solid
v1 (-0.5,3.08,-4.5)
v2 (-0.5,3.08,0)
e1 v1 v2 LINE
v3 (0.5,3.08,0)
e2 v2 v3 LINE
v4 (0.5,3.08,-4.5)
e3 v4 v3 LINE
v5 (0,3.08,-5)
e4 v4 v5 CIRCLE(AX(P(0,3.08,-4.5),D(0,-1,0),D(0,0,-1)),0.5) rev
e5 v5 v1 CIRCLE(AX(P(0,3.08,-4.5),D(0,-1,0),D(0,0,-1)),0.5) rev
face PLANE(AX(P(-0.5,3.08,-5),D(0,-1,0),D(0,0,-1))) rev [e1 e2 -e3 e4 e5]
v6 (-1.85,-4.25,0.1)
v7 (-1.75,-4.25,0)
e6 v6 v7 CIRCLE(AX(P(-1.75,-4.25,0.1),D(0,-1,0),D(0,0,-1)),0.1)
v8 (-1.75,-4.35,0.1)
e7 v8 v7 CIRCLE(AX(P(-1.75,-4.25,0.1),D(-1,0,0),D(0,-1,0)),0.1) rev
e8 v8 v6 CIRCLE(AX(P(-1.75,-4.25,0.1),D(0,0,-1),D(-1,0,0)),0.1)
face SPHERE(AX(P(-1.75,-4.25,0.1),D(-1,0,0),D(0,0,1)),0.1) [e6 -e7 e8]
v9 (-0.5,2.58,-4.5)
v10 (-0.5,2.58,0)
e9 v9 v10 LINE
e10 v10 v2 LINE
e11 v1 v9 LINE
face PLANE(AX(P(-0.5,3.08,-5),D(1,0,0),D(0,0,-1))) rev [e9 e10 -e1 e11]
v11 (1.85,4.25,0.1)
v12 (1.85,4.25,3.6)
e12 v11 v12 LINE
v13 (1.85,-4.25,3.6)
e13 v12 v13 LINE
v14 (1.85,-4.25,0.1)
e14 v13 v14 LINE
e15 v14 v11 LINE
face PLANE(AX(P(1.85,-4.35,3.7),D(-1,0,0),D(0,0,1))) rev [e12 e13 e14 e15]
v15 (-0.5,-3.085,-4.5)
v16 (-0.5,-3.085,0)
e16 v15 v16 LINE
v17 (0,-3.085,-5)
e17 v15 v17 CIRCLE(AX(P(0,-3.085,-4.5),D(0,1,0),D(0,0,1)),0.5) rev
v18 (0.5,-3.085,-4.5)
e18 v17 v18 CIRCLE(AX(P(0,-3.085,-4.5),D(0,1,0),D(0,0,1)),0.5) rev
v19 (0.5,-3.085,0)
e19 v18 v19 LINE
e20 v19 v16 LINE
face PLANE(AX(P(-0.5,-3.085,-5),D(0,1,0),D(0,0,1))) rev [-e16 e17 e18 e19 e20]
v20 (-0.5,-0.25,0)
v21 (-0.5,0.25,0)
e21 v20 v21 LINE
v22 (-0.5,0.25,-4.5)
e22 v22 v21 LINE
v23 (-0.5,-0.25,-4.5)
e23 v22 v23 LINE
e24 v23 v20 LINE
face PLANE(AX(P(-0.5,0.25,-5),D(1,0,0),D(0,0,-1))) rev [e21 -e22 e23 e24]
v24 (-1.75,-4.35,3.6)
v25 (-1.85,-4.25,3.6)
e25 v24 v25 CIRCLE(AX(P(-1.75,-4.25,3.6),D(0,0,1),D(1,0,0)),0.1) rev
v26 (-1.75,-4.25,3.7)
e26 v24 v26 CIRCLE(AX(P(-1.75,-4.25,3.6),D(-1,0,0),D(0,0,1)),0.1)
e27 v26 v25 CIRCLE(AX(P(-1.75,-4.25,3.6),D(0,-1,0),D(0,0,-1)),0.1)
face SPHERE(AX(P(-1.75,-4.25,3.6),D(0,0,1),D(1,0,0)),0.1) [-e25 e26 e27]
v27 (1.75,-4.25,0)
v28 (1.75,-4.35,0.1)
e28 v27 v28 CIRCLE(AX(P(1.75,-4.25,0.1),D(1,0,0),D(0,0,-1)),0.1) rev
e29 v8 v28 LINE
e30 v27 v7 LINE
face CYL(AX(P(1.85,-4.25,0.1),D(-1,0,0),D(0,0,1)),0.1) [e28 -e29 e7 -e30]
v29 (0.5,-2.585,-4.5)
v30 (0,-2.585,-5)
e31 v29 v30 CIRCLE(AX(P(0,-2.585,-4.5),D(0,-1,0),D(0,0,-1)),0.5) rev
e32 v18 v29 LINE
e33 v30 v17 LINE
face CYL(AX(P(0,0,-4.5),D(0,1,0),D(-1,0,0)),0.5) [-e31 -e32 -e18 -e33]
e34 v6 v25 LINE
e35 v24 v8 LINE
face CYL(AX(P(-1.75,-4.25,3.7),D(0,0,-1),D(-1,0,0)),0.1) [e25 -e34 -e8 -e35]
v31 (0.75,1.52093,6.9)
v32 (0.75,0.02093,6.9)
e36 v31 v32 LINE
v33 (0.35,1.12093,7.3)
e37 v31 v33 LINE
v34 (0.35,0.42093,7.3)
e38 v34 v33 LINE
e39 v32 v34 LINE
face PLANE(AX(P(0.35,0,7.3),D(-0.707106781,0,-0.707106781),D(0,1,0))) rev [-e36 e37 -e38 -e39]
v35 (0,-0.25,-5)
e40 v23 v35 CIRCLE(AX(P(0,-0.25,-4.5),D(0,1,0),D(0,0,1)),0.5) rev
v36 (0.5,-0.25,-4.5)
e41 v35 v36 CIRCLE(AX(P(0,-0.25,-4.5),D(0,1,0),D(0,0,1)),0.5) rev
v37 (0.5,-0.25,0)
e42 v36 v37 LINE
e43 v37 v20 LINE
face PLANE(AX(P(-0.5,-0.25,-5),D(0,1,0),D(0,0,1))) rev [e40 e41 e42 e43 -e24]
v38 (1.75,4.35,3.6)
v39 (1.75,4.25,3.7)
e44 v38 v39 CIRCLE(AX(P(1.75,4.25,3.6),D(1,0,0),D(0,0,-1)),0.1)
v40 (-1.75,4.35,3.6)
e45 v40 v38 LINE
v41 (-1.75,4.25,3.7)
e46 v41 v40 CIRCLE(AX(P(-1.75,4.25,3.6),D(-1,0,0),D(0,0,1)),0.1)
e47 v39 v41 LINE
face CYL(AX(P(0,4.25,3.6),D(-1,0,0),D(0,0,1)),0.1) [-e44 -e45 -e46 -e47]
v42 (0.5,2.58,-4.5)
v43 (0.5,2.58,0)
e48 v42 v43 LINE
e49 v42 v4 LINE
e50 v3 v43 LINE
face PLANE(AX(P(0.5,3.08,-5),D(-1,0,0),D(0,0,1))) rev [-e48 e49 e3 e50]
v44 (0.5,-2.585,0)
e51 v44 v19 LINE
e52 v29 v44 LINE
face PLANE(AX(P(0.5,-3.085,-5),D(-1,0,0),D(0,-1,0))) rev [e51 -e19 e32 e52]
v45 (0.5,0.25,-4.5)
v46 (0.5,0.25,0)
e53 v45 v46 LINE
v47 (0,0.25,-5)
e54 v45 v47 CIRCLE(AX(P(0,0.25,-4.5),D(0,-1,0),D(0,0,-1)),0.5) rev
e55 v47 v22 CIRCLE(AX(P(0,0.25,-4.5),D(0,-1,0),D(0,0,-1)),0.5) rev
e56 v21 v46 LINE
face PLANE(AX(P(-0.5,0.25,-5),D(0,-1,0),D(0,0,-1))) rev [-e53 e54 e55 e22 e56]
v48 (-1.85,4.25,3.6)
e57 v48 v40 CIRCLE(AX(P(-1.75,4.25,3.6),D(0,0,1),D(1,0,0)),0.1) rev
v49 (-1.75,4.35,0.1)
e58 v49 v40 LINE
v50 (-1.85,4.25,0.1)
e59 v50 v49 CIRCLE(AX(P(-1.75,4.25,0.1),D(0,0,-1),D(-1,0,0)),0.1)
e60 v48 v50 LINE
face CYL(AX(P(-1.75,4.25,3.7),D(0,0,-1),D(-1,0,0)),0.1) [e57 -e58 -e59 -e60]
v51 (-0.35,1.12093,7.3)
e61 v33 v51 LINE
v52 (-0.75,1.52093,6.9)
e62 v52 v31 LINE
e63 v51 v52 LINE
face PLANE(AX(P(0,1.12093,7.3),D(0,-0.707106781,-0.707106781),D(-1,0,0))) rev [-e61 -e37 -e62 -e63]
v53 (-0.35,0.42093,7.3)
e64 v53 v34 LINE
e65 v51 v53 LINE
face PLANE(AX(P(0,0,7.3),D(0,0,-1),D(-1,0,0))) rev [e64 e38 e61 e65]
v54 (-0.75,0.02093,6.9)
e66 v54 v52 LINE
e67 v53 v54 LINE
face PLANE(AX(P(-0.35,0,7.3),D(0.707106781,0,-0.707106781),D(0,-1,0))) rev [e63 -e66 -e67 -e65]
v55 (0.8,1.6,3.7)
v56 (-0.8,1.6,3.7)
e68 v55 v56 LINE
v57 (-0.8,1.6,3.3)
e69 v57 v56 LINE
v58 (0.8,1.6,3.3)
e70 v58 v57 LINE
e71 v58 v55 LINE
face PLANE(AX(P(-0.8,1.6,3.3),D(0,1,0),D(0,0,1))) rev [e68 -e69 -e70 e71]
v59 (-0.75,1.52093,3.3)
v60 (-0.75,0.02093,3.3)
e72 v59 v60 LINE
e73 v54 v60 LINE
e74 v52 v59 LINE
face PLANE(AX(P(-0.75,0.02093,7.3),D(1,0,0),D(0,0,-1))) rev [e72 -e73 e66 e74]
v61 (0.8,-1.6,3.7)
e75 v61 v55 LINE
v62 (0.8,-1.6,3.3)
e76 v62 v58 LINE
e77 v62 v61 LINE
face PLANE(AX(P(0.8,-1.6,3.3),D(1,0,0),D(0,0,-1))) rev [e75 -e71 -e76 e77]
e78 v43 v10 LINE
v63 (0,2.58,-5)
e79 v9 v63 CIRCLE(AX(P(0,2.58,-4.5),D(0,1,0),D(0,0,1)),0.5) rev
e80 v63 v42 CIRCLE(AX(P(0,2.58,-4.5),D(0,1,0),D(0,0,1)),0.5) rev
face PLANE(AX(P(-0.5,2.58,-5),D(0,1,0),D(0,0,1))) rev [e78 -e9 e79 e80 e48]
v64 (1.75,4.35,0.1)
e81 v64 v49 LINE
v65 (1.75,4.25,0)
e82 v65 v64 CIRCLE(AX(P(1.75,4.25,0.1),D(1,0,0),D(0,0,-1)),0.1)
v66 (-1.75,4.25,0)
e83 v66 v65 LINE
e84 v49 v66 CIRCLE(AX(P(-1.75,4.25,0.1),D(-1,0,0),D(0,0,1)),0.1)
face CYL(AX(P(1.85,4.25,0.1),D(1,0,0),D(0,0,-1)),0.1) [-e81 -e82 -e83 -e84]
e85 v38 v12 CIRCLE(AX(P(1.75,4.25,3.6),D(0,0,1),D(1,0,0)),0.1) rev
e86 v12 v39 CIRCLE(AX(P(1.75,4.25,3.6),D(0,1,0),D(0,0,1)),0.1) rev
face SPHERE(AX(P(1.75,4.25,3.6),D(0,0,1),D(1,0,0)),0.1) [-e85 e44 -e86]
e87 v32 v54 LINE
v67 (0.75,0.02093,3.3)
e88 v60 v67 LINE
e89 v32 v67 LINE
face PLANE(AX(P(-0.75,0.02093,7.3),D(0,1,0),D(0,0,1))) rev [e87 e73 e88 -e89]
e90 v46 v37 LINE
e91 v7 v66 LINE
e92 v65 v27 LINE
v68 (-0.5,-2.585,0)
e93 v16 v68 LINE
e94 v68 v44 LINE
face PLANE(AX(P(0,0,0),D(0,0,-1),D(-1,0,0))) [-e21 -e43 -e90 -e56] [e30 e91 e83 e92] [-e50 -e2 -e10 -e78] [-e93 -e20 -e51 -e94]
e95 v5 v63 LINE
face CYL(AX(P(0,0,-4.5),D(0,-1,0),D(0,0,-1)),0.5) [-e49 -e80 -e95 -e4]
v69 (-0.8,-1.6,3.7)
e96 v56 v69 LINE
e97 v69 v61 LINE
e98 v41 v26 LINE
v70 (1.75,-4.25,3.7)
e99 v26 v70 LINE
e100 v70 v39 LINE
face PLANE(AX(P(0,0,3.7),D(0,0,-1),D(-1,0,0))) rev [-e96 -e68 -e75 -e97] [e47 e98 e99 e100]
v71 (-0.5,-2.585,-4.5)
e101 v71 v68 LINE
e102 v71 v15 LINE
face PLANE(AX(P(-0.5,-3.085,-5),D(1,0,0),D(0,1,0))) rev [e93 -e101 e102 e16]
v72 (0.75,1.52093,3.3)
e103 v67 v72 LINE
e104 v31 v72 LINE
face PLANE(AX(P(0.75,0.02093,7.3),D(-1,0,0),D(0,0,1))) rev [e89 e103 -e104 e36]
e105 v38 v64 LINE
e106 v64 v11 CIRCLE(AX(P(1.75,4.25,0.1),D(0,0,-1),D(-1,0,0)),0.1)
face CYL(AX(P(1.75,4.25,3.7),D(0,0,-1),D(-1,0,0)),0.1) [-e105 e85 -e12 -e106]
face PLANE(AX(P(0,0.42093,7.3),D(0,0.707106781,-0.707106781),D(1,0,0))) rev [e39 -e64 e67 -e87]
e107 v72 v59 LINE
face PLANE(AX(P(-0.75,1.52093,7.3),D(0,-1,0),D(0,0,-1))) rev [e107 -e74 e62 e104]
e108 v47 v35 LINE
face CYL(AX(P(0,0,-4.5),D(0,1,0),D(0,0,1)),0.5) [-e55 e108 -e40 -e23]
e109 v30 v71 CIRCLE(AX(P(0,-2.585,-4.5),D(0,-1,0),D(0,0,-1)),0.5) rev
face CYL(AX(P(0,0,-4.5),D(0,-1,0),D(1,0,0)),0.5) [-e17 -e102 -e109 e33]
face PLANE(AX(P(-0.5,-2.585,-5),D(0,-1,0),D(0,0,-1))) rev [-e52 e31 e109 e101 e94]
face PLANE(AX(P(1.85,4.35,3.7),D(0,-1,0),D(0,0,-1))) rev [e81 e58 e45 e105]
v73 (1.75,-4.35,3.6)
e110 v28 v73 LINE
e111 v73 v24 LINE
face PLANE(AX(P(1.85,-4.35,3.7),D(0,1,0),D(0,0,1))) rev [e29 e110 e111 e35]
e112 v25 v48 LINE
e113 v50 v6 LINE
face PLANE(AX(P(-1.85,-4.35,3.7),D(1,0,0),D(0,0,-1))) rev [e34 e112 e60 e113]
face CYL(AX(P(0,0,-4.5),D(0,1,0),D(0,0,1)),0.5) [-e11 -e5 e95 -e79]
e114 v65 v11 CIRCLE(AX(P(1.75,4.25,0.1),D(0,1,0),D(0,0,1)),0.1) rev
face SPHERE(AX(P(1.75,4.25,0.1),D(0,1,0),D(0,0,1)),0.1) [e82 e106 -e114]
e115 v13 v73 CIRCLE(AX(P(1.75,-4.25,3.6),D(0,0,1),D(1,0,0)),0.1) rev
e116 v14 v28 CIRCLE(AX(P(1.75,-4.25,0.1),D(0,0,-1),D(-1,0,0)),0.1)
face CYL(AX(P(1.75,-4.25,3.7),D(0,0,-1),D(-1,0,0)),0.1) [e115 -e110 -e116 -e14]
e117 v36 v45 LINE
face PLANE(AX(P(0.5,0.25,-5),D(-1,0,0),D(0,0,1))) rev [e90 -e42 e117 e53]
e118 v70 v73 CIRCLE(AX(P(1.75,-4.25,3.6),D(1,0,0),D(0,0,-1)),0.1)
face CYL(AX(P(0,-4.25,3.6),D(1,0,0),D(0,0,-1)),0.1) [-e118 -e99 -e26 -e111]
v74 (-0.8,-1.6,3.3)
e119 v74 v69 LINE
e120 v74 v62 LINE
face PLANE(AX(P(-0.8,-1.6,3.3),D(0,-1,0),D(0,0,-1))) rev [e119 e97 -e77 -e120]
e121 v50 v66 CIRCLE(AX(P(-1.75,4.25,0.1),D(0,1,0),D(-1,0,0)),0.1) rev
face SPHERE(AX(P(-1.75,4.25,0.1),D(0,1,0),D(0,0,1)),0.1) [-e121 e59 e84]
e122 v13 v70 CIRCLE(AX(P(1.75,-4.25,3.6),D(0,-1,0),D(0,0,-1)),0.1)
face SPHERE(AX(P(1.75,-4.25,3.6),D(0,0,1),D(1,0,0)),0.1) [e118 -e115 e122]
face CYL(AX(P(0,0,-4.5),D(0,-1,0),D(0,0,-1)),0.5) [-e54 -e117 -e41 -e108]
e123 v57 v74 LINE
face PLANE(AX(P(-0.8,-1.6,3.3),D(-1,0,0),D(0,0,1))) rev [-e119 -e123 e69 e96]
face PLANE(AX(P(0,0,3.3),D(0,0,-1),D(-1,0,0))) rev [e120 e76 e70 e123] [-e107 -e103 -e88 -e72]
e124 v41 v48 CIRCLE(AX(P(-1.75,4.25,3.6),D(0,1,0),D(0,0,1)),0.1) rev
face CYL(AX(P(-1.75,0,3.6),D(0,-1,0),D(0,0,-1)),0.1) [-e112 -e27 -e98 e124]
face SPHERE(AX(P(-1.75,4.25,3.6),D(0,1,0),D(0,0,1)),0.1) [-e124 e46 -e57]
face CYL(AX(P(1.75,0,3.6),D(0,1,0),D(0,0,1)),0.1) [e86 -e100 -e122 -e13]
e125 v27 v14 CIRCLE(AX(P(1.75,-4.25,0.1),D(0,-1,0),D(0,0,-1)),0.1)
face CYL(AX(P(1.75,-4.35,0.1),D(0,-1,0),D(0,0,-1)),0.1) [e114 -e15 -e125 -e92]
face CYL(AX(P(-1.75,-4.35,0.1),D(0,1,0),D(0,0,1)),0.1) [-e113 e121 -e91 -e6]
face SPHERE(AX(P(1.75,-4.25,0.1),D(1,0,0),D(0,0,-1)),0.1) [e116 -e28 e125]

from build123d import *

# Parameters (mm, degrees)
SKIZZE1_W                       = 8.7
SKIZZE1_H                       = 3.7
AUFSATZ_LINEAR_AUSTRAGEN1_DEPTH = 3.7
VERRUNDUNG1_R                   = 0.1
SKIZZE2_W                       = 1.6
SKIZZE2_H                       = 3.2
SCHNITT_LINEAR_AUSTRAGEN1_DEPTH = 0.4
SKIZZE3_W                       = 1.5
SKIZZE3_H                       = 1.5
AUFSATZ_LINEAR_AUSTRAGEN2_DEPTH = 4
FASE1_SIZE                      = 0.4
SKIZZE4_W                       = 1
SKIZZE4_H                       = 0.5
AUFSATZ_LINEAR_AUSTRAGEN3_DEPTH = 5
VERRUNDUNG2_R                   = 0.5


with BuildPart() as part:
    # Skizze1 → Aufsatz-Linear austragen1 (new body)
    with BuildSketch(Plane(origin=(0, 0, 0), x_dir=(0, 1, 0), z_dir=(0, 0, 1))):
        Rectangle(SKIZZE1_W, SKIZZE1_H)
    extrude(amount=AUFSATZ_LINEAR_AUSTRAGEN1_DEPTH)

    # Verrundung1
    verrundung1_edges = [part.edges().sort_by_distance(p)[0] for p in [
        (0, -4.35, 3.7),
        (1.85, 0, 3.7),
        (0, 4.35, 3.7),
        (1.85, 0, 0),
        (0, -4.35, 0),
        (-1.85, 0, 0),
        (0, 4.35, 0),
        (1.85, 4.35, 1.85),
        (1.85, -4.35, 1.85),
        (-1.85, -4.35, 1.85),
        (-1.85, 4.35, 1.85),
        (-1.85, 0, 3.7),
    ]]
    fillet(verrundung1_edges, radius=VERRUNDUNG1_R)

    # Skizze2 → Schnitt-Linear austragen1 (cut)
    with BuildSketch(Plane.XY.offset(3.7)):
        Rectangle(SKIZZE2_W, SKIZZE2_H)
    extrude(amount=-SCHNITT_LINEAR_AUSTRAGEN1_DEPTH, mode=Mode.SUBTRACT)

    # Skizze3 → Aufsatz-Linear austragen2 (add)
    with BuildSketch(Plane.XY.offset(3.3)):
        with Locations((0, 0.770929874)):
            Rectangle(SKIZZE3_W, SKIZZE3_H)
    extrude(amount=AUFSATZ_LINEAR_AUSTRAGEN2_DEPTH)

    # Fase1
    fase1_edges = [part.edges().sort_by_distance(p)[0] for p in [
        (0.75, 0.770929874, 7.3),
        (0, 1.520929874, 7.3),
        (-0.75, 0.770929874, 7.3),
        (0, 0.020929874, 7.3),
    ]]
    chamfer(fase1_edges, length=FASE1_SIZE)

    # Skizze4 → Aufsatz-Linear austragen3 (add)
    with BuildSketch(Plane(origin=(0, 0, 0), x_dir=(1, 0, 0), z_dir=(0, 0, -1))):
        with Locations((0, 2.835)):
            Rectangle(SKIZZE4_W, SKIZZE4_H)
        Rectangle(SKIZZE4_W, SKIZZE4_H)
        with Locations((0, -2.83)):
            Rectangle(SKIZZE4_W, SKIZZE4_H)
    extrude(amount=AUFSATZ_LINEAR_AUSTRAGEN3_DEPTH)

    # Verrundung2
    verrundung2_edges = [part.edges().sort_by_distance(p)[0] for p in [
        (-0.5, 2.83, -5),
        (0.5, 2.83, -5),
        (-0.5, 0, -5),
        (0.5, 0, -5),
        (-0.5, -2.835, -5),
        (0.5, -2.835, -5),
    ]]
    fillet(verrundung2_edges, radius=VERRUNDUNG2_R - 0.0001)  # a hair under: the kernel refuses the full size


solid = part.part
